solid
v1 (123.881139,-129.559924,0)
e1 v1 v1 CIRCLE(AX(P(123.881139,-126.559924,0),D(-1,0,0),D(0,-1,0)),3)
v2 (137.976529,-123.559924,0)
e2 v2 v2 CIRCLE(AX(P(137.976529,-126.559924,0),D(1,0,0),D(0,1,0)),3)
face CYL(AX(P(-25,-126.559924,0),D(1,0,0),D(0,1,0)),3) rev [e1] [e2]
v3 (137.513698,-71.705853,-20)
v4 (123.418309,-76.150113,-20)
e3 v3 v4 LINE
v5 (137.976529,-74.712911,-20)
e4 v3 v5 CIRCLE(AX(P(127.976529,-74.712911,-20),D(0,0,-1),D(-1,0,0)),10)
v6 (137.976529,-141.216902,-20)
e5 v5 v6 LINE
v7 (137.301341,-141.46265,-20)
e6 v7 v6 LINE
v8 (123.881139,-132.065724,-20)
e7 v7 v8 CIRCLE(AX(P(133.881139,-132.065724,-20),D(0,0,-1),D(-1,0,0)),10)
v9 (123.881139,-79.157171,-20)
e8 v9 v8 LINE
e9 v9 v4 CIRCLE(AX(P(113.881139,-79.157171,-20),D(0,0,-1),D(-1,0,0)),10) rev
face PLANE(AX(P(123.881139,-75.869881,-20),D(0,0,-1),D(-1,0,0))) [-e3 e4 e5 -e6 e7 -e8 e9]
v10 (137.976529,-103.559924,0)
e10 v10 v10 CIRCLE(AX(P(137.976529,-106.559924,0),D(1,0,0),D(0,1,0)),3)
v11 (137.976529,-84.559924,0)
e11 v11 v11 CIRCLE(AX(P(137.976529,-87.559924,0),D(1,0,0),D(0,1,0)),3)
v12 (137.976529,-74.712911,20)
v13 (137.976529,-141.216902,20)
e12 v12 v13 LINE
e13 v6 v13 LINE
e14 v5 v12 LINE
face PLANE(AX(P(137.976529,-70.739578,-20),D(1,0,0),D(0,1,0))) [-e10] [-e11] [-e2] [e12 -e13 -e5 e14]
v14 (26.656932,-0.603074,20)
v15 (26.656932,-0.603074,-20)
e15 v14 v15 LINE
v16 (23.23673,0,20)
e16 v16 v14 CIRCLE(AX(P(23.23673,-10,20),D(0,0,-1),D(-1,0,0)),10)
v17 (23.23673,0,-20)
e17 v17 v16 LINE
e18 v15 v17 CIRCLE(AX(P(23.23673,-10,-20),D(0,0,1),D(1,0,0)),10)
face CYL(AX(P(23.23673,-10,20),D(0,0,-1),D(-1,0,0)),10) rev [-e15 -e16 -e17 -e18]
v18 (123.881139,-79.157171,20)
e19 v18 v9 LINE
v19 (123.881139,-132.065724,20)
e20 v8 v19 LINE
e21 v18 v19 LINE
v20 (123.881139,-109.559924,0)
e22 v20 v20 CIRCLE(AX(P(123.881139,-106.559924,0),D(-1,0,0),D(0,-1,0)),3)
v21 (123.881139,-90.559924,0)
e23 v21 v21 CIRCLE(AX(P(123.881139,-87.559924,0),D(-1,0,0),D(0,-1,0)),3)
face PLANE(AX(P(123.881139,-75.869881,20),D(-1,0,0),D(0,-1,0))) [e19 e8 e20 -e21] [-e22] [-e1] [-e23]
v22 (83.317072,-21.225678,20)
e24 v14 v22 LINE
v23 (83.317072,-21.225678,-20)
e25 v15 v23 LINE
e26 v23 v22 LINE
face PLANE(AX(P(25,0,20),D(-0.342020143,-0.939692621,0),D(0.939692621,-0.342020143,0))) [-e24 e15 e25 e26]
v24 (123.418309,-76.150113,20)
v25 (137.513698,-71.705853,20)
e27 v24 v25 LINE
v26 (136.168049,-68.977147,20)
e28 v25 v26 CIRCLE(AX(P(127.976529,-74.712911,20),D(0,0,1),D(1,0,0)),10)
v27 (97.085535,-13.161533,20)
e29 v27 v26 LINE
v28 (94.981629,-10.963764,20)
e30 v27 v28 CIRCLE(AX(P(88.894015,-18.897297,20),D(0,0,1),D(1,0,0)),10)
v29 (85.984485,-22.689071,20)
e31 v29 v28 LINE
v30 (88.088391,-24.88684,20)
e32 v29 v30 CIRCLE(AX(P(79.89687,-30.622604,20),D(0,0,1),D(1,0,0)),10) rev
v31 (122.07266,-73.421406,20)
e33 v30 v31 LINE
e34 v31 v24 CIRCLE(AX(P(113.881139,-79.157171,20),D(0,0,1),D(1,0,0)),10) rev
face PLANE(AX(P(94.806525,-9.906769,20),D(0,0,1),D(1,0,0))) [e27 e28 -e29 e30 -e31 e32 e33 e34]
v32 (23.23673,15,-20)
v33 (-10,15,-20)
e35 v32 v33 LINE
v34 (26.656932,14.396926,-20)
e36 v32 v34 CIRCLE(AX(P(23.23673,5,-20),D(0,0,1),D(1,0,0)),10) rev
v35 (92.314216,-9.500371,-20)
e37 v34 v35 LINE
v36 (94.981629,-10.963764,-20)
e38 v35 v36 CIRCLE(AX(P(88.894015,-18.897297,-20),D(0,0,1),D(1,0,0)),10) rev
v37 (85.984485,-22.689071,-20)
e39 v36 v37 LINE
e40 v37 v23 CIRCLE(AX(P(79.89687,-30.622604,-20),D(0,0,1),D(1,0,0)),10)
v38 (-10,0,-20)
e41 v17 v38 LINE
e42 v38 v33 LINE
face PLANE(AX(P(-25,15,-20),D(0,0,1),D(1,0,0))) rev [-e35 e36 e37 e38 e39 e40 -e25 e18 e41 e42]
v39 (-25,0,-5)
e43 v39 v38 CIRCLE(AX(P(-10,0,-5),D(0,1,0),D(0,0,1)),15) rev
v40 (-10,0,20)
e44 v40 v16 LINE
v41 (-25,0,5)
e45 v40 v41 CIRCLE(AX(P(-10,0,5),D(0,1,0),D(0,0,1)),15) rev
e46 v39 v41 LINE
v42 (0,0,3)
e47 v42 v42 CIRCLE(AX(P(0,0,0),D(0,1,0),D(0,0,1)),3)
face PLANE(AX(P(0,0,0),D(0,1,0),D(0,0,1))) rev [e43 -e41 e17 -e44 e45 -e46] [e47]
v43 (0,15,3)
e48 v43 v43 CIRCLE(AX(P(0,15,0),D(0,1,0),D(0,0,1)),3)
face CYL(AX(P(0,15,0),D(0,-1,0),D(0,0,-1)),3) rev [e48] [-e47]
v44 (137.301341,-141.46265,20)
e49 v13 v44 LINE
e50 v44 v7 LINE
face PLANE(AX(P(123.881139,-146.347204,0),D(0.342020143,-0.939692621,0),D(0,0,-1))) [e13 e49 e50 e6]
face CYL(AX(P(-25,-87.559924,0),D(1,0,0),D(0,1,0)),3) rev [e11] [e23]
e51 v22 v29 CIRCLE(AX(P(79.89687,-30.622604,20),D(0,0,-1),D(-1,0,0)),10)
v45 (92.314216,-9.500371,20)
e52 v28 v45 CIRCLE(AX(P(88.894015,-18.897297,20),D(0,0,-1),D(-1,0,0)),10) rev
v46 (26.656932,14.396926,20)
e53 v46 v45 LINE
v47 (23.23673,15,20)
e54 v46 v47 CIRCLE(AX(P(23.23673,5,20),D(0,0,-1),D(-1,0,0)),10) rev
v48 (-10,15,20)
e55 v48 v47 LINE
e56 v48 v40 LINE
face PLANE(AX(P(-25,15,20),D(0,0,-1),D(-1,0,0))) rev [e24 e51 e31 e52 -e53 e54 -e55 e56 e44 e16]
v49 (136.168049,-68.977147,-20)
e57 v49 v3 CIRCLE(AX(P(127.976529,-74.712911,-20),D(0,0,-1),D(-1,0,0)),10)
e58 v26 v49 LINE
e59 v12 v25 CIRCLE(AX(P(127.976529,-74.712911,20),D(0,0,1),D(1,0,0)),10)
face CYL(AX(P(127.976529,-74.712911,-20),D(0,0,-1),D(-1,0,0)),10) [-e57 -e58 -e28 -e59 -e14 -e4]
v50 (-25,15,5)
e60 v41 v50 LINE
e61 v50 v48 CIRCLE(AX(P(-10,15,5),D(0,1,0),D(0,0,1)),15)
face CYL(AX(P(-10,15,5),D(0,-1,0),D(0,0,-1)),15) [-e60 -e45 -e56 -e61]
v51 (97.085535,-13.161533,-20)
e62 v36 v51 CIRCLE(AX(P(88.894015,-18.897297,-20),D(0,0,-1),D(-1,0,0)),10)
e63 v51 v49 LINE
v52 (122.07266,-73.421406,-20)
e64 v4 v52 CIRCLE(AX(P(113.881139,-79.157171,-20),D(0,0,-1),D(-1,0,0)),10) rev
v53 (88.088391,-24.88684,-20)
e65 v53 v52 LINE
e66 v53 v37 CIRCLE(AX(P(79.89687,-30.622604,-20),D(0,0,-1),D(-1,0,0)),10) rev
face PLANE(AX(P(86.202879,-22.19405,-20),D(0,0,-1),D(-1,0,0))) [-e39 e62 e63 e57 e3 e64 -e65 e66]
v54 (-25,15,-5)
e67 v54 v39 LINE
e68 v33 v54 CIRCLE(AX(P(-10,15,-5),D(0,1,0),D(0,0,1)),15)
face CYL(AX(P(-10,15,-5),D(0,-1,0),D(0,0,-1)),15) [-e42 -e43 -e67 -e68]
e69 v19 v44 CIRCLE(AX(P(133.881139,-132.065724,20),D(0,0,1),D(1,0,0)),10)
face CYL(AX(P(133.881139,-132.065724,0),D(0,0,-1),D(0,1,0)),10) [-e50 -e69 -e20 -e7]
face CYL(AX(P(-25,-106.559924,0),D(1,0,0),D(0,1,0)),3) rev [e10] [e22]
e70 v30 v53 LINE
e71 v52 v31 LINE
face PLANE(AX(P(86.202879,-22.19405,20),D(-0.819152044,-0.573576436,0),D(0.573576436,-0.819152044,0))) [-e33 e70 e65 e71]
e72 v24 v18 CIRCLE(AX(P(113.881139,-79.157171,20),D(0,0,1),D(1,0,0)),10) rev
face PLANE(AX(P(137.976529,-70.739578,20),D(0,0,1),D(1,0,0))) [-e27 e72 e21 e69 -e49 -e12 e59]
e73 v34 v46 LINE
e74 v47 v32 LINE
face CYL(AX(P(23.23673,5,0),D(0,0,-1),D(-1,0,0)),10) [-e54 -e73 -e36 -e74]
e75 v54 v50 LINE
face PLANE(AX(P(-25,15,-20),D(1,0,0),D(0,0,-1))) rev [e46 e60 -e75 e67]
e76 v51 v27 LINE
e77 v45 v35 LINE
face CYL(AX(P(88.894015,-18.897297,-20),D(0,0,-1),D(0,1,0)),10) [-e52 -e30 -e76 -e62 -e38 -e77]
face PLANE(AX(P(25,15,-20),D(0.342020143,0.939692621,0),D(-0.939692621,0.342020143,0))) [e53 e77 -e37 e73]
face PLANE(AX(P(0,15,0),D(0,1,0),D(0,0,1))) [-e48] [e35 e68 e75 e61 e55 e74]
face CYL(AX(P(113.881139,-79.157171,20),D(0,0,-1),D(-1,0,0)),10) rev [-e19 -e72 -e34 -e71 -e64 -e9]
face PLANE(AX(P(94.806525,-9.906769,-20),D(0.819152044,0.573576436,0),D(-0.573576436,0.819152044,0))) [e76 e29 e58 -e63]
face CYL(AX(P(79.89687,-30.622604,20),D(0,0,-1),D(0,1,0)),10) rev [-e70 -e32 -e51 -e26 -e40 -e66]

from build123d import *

# Parameters (mm, degrees)
SKETCH1_W           = 50
SKETCH1_H           = 40
SKETCH1_R           = 3
BOSS_EXTRUDE1_DEPTH = 15
SWEEP1_START        = -20
SWEEP1_DEPTH        = 40
FILLET1_R           = 15
SKETCH3_R           = 3
CUT_EXTRUDE1_DEPTH  = 220.951933549
FILLET2_R           = 10


# Read off the part's stored shape, not the designer's step: Sweep1
with BuildPart() as part:
    # Sketch1 → Boss-Extrude1 (new body)
    with BuildSketch(Plane(origin=(0, 0, 0), x_dir=(1, 0, 0), z_dir=(0, 1, 0))):
        Rectangle(SKETCH1_W, SKETCH1_H)
        with Locations(Location((0, 0, 0), (0, 0, 270))):
            Circle(SKETCH1_R, mode=Mode.SUBTRACT)
    extrude(amount=BOSS_EXTRUDE1_DEPTH)

    # Sweep1 outline → Sweep1 (add)
    with BuildSketch(Plane.XY.offset(SWEEP1_START)):
        Polygon((123.881139344, -76.004182722), (123.881139344, -146.347204208), (137.976528655, -141.216902058), (137.976528655, -71.559923544), (95.277055769, -10.578756452), (25, 15), (25, 0), (86.279911141, -22.304063614), align=None)
    extrude(amount=SWEEP1_DEPTH)

    # Fillet1
    fillet1_edges = [part.edges().sort_by_distance(p)[0] for p in [
        (-25, 7.5, 20),
        (-25, 7.5, -20),
    ]]
    fillet(fillet1_edges, radius=FILLET1_R)

    # Sketch3 → Cut-Extrude1 (cut, through all)
    with BuildSketch(Plane(origin=(137.976528655, 0, 0), x_dir=(0, 0, -1), z_dir=(1, 0, 0))):
        with Locations(Location((0, -106.559923544, 0), (0, 0, 90))):
            Circle(SKETCH3_R)
        with Locations(Location((0, -87.559923544, 0), (0, 0, 90))):
            Circle(SKETCH3_R)
        with Locations(Location((0, -126.559923544, 0), (0, 0, 90))):
            Circle(SKETCH3_R)
    extrude(amount=-CUT_EXTRUDE1_DEPTH, mode=Mode.SUBTRACT)

    # Fillet2
    fillet2_edges = [part.edges().sort_by_distance(p)[0] for p in [
        (123.881139344, -146.347204208, 0),
        (137.976528655, -71.559923544, 0),
        (123.881139344, -76.004182722, 0),
        (95.277055769, -10.578756452, 0),
        (86.279911141, -22.304063614, 0),
        (25, 15, 0),
        (25, 0, 0),
    ]]
    fillet(fillet2_edges, radius=FILLET2_R)


solid = part.part
